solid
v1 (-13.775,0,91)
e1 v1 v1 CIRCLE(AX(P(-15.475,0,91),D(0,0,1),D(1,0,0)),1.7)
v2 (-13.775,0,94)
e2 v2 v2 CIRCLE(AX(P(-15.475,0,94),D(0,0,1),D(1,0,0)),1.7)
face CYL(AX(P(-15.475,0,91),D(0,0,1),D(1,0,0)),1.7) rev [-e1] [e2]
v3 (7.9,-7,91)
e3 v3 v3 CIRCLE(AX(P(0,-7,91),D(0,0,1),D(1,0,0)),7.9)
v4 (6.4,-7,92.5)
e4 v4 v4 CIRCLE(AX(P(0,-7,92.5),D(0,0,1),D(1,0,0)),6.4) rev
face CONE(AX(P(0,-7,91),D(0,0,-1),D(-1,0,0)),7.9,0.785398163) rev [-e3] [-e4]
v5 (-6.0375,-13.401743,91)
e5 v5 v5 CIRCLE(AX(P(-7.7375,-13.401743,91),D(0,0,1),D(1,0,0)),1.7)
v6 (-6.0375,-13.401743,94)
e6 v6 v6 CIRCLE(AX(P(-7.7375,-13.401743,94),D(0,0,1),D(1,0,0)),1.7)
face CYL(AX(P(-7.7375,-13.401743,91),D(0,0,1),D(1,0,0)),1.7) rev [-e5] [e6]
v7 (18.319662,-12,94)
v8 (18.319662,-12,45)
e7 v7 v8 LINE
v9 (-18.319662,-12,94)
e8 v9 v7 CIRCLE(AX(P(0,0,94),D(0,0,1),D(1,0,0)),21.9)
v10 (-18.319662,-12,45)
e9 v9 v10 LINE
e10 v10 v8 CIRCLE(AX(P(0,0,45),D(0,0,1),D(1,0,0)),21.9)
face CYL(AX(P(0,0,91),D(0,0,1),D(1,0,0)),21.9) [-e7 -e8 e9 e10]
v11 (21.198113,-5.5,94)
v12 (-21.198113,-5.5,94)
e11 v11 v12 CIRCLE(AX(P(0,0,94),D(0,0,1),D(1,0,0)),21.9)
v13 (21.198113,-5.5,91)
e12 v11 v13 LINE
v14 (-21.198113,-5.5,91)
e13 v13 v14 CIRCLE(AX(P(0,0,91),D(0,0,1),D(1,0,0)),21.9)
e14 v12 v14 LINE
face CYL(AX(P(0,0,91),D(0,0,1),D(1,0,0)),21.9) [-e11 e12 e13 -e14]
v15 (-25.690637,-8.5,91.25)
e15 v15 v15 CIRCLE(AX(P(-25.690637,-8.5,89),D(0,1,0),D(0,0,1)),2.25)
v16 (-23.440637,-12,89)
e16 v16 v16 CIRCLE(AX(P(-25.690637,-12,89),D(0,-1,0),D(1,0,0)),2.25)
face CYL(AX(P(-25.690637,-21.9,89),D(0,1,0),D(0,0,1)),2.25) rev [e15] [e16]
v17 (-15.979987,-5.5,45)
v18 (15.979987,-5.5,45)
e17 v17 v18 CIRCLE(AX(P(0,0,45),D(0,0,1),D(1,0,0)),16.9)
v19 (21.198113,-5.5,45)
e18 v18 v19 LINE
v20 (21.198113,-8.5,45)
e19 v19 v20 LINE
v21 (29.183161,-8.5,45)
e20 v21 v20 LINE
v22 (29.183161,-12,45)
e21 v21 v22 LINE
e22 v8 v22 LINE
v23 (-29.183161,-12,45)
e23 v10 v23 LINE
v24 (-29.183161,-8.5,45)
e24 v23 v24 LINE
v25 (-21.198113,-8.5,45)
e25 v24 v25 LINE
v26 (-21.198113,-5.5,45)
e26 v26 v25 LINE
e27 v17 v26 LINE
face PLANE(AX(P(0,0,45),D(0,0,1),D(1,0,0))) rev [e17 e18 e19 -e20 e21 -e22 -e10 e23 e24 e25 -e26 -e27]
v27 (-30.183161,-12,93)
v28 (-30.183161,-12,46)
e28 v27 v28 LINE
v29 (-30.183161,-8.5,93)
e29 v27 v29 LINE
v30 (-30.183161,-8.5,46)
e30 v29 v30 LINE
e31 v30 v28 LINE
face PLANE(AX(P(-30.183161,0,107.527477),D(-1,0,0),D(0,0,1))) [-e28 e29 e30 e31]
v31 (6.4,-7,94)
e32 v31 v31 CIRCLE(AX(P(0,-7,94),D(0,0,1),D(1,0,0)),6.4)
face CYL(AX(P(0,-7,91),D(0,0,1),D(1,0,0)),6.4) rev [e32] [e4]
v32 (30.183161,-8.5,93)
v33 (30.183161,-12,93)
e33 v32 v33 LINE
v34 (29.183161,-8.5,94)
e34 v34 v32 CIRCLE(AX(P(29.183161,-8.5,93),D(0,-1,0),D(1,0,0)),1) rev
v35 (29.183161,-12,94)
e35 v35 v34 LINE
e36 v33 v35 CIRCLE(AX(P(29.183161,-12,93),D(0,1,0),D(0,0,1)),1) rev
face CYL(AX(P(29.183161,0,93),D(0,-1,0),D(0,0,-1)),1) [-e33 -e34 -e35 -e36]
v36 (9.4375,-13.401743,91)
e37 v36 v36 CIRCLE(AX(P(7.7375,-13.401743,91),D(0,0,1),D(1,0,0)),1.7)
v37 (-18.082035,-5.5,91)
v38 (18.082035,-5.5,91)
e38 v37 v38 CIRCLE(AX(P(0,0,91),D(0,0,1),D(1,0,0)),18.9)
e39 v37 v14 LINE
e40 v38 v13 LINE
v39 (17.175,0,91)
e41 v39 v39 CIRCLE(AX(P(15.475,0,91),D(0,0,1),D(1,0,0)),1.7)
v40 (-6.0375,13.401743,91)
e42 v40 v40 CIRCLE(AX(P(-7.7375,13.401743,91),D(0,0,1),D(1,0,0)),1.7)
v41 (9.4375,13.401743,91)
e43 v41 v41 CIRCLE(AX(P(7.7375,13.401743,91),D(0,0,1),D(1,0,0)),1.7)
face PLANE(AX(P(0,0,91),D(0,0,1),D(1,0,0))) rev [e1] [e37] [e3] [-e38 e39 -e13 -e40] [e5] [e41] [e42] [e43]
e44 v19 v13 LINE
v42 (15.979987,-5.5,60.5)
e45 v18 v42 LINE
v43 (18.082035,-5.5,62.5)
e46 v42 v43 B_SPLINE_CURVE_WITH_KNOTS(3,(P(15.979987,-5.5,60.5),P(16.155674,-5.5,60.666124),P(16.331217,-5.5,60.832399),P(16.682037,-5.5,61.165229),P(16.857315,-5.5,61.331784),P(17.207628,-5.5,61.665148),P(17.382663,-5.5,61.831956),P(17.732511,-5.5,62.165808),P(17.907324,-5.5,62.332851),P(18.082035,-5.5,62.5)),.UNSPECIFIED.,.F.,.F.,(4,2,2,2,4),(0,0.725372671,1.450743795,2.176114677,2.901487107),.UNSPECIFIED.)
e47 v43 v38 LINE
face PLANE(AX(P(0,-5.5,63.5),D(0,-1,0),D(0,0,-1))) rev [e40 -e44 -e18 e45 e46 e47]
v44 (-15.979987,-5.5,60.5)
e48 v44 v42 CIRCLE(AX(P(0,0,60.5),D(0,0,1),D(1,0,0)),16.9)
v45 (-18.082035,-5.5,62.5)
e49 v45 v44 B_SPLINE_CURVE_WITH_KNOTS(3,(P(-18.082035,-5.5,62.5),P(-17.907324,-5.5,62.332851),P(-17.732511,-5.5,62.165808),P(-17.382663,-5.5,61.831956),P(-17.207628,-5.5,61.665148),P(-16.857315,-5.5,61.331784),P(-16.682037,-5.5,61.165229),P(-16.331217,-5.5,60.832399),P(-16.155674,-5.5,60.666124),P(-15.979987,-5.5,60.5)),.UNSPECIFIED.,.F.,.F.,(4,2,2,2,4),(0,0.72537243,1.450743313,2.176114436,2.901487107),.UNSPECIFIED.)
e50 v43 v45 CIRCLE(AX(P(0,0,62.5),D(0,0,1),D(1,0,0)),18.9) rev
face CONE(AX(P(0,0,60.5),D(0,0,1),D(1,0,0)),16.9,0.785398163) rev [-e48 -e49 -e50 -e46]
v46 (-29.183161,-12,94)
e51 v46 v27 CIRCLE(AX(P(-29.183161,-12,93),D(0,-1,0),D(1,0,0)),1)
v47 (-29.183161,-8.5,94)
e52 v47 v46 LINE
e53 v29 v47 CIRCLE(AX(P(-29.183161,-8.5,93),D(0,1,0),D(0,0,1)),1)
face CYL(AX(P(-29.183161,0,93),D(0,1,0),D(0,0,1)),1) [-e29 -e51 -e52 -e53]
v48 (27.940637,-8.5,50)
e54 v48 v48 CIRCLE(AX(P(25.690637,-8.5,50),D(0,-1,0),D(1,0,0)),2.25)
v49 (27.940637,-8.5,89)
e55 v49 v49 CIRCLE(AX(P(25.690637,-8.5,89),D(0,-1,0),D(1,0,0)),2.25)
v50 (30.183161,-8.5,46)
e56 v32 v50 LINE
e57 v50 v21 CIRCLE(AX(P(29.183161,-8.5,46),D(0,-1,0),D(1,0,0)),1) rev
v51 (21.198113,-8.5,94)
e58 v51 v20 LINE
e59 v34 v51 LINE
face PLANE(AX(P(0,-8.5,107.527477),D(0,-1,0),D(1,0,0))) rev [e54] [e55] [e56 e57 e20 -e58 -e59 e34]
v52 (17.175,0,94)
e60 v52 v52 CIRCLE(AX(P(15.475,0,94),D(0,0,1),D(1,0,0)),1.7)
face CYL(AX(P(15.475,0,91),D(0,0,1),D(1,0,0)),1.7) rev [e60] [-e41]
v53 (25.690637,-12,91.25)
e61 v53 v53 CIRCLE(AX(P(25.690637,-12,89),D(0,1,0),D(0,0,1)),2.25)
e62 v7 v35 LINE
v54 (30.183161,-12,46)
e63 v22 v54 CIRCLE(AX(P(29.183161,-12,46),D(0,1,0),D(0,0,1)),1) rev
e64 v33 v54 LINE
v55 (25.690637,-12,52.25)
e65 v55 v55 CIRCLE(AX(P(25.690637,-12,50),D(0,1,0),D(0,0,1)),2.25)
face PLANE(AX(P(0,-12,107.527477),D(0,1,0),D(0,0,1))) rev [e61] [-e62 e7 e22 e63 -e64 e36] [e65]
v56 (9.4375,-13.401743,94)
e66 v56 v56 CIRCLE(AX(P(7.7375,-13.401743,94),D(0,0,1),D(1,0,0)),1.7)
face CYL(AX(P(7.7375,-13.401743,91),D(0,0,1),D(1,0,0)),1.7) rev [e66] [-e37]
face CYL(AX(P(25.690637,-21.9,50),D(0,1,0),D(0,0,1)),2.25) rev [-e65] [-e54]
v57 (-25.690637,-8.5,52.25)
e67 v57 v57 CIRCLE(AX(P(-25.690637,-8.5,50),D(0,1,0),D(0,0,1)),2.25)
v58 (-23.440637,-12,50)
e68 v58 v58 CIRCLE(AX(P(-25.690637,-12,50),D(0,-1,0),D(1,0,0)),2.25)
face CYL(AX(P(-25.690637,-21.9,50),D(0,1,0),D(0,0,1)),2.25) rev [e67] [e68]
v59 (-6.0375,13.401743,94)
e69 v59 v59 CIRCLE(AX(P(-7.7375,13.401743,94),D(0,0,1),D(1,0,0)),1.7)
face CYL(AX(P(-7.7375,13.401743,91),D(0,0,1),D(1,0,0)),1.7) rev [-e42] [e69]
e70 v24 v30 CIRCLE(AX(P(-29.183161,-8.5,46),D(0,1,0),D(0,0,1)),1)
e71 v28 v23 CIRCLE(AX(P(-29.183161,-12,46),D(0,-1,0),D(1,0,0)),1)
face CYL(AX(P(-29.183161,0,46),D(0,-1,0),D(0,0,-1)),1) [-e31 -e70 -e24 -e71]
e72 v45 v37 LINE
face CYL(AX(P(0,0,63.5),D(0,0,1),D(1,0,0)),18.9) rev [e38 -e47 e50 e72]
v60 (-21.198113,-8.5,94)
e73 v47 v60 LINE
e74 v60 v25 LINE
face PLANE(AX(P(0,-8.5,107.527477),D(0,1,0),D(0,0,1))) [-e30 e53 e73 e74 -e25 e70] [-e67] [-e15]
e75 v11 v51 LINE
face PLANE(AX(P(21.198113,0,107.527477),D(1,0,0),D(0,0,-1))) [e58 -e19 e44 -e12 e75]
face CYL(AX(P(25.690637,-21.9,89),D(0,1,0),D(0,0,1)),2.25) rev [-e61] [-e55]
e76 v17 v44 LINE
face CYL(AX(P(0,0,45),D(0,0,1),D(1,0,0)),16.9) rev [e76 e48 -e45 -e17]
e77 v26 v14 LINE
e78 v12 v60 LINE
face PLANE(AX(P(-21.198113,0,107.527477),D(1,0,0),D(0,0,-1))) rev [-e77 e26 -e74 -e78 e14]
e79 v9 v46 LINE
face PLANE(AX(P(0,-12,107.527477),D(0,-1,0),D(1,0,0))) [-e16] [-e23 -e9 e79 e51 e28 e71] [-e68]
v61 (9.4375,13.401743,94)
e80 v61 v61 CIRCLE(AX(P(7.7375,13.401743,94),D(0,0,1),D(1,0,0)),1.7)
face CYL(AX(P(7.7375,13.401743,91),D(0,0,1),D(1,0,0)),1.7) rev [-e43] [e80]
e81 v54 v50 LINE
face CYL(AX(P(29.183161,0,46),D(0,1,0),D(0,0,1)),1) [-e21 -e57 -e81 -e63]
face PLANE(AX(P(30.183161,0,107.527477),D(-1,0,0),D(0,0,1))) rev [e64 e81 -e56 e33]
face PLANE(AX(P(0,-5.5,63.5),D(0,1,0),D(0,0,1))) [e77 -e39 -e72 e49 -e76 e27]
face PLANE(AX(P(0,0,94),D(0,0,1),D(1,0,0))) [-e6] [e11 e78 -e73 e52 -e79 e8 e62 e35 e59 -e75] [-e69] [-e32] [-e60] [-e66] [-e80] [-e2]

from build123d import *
from build123d.topology import SkipClean

# Parameters (mm, degrees)
BOSS_EXTRUDE1_START     = 94
SKETCH1_R               = 21.9
SKETCH1_R_2             = 1.7
SKETCH1_R_3             = 6.4
BOSS_EXTRUDE1_DEPTH     = 3
BOSS_EXTRUDE2_START     = 91
BOSS_EXTRUDE2_DEPTH     = 27.5
BOSS_EXTRUDE3_START     = 45
BOSS_EXTRUDE3_DEPTH     = 18.5
BOSS_EXTRUDE7_START     = 94
BOSS_EXTRUDE7_DEPTH     = 49
CUT_EXTRUDE5_DEPTH      = 104.301419283
CUT_EXTRUDE5_DEPTH_BACK = 104.301419283
SKETCH4_R               = 2.25
CHAMFER3_SIZE           = 3
CHAMFER4_SIZE           = 1.5
FILLET2_R               = 1


with BuildPart() as part:
    # Sketch1 → Boss-Extrude1 (new body)
    with BuildSketch(Plane.XY.offset(BOSS_EXTRUDE1_START)):
        Circle(SKETCH1_R)
        with Locations((15.475, 0)):
            Circle(SKETCH1_R_2, mode=Mode.SUBTRACT)
        with Locations((7.7375, -13.401743124)):
            Circle(SKETCH1_R_2, mode=Mode.SUBTRACT)
        with Locations((-7.7375, -13.401743124)):
            Circle(SKETCH1_R_2, mode=Mode.SUBTRACT)
        with Locations((-15.475, 0)):
            Circle(SKETCH1_R_2, mode=Mode.SUBTRACT)
        with Locations((-7.7375, 13.401743124)):
            Circle(SKETCH1_R_2, mode=Mode.SUBTRACT)
        with Locations((7.7375, 13.401743124)):
            Circle(SKETCH1_R_2, mode=Mode.SUBTRACT)
        with Locations((0, -7)):
            Circle(SKETCH1_R_3, mode=Mode.SUBTRACT)
    extrude(amount=-BOSS_EXTRUDE1_DEPTH)

    # Sketch1<5> → Boss-Extrude2 (add)
    with BuildSketch(Plane.XY.offset(BOSS_EXTRUDE2_START)):
        with BuildLine():
            ThreePointArc((18.319661569, -12), (19.330787418, -10.292262036), (20.183161298, -8.5))
            Line((20.183161298, -8.5), (16.880758277, -8.5))
            ThreePointArc((16.880758277, -8.5), (0, -18.9), (-16.880758277, -8.5))
            Line((-16.880758277, -8.5), (-20.183161298, -8.5))
            ThreePointArc((-20.183161298, -8.5), (-19.330787418, -10.292262036), (-18.319661569, -12))
            ThreePointArc((-18.319661569, -12), (0, -21.9), (18.319661569, -12))
        make_face()
        with BuildLine():
            Line((-20.183161298, -8.5), (-16.880758277, -8.5))
            ThreePointArc((-16.880758277, -8.5), (-17.545632887, -7.025721786), (-18.082035284, -5.5))
            Line((-18.082035284, -5.5), (-21.198113124, -5.5))
            ThreePointArc((-21.198113124, -5.5), (-20.744938375, -7.018371022), (-20.183161298, -8.5))
        make_face()
        with BuildLine():
            Line((16.880758277, -8.5), (20.183161298, -8.5))
            ThreePointArc((20.183161298, -8.5), (20.744938375, -7.018371022), (21.198113124, -5.5))
            Line((21.198113124, -5.5), (18.082035284, -5.5))
            ThreePointArc((18.082035284, -5.5), (17.545632887, -7.025721786), (16.880758277, -8.5))
        make_face()
    extrude(amount=-BOSS_EXTRUDE2_DEPTH)

    # Sketch1<6> → Boss-Extrude3 (add)
    with SkipClean():  # the faces are left unmerged after this step: merging them gives an invalid solid
        with BuildSketch(Plane.XY.offset(BOSS_EXTRUDE3_START)):
            with BuildLine():
                Line((21.198113124, -5.5), (15.979987484, -5.5))
                ThreePointArc((15.979987484, -5.5), (0, -16.9), (-15.979987484, -5.5))
                Line((-15.979987484, -5.5), (-21.198113124, -5.5))
                ThreePointArc((-21.198113124, -5.5), (0, -21.9), (21.198113124, -5.5))
            make_face()
        extrude(amount=BOSS_EXTRUDE3_DEPTH)

    # Sketch1<11> → Boss-Extrude7 (add)
    with SkipClean():  # the faces are left unmerged after this step: merging them gives an invalid solid
        with BuildSketch(Plane.XY.offset(BOSS_EXTRUDE7_START)):
            with BuildLine():
                ThreePointArc((21.198113124, -5.5), (20.024388359, -8.867574124), (18.319661569, -12))
                Line((18.319661569, -12), (30.183161298, -12))
                Line((30.183161298, -12), (30.183161298, -8.5))
                Line((30.183161298, -8.5), (21.198113124, -8.5))
                Line((21.198113124, -8.5), (21.198113124, -5.5))
            make_face()
            with BuildLine():
                Line((-30.183161298, -12), (-18.319661569, -12))
                ThreePointArc((-18.319661569, -12), (-20.024388359, -8.867574124), (-21.198113124, -5.5))
                Line((-21.198113124, -5.5), (-21.198113124, -8.5))
                Line((-21.198113124, -8.5), (-30.183161298, -8.5))
                Line((-30.183161298, -8.5), (-30.183161298, -12))
            make_face()
        extrude(amount=-BOSS_EXTRUDE7_DEPTH)

    # Sketch4 → Cut-Extrude5 (cut, two sides: drawn at the far end of the back side and taken through both)
    with SkipClean():  # the faces are left unmerged after this step: merging them gives an invalid solid
        with BuildSketch(Plane(origin=(0, -8.5, 0), x_dir=(1, 0, 0), z_dir=(0, 1, 0)).offset(-CUT_EXTRUDE5_DEPTH_BACK)):
            with Locations(Location((-25.690637211, -50, 0), (0, 0, 270))):
                Circle(SKETCH4_R)
            with Locations(Location((-25.690637211, -89, 0), (0, 0, 270))):
                Circle(SKETCH4_R)
            with Locations(Location((25.690637211, -50, 0), (0, 0, 270))):
                Circle(SKETCH4_R)
            with Locations(Location((25.690637211, -89, 0), (0, 0, 270))):
                Circle(SKETCH4_R)
        extrude(amount=CUT_EXTRUDE5_DEPTH + CUT_EXTRUDE5_DEPTH_BACK, mode=Mode.SUBTRACT)

    # Chamfer3
    # the kernel refuses this chamfer: 3 mm, written as the material it takes off along each edge
    with BuildSketch(Plane(origin=(0, 0, 63.5), x_dir=(0.9921367643584464, 0.1251584627915844, 0), z_dir=(-0.1251584627915844, 0.9921367643584464, 0))) as chamfer3_piece_1_section:
        Polygon((16.9 + CHAMFER3_SIZE, 0), (16.9, CHAMFER3_SIZE), (16.9, 0), align=None)
    chamfer3_piece_1 = revolve(axis=Axis((0, 0, 63.5), (0, 0, -1)), revolution_arc=194.379813793, mode=Mode.PRIVATE)
    chamfer3_piece_1 = chamfer3_piece_1 & Plane(origin=(0, 0, 61.502732277), x_dir=(0.8931618135876879, -0.4497354497354555, 0), z_dir=(0, 0, 1)) * Cylinder(18.9, 80, mode=Mode.PRIVATE)
    add(chamfer3_piece_1, mode=Mode.SUBTRACT)

    # Chamfer4
    chamfer4_edges = [part.edges().sort_by_distance(p)[0] for p in [
        (-6.4, -7, 91),
    ]]
    chamfer(chamfer4_edges, length=CHAMFER4_SIZE)

    # Fillet2
    fillet2_edges = [part.edges().sort_by_distance(p)[0] for p in [
        (-30.183161298, -10.25, 45),
        (-30.183161298, -10.25, 94),
        (30.183161298, -10.25, 45),
        (30.183161298, -10.25, 94),
    ]]
    fillet(fillet2_edges, radius=FILLET2_R)


solid = part.part
